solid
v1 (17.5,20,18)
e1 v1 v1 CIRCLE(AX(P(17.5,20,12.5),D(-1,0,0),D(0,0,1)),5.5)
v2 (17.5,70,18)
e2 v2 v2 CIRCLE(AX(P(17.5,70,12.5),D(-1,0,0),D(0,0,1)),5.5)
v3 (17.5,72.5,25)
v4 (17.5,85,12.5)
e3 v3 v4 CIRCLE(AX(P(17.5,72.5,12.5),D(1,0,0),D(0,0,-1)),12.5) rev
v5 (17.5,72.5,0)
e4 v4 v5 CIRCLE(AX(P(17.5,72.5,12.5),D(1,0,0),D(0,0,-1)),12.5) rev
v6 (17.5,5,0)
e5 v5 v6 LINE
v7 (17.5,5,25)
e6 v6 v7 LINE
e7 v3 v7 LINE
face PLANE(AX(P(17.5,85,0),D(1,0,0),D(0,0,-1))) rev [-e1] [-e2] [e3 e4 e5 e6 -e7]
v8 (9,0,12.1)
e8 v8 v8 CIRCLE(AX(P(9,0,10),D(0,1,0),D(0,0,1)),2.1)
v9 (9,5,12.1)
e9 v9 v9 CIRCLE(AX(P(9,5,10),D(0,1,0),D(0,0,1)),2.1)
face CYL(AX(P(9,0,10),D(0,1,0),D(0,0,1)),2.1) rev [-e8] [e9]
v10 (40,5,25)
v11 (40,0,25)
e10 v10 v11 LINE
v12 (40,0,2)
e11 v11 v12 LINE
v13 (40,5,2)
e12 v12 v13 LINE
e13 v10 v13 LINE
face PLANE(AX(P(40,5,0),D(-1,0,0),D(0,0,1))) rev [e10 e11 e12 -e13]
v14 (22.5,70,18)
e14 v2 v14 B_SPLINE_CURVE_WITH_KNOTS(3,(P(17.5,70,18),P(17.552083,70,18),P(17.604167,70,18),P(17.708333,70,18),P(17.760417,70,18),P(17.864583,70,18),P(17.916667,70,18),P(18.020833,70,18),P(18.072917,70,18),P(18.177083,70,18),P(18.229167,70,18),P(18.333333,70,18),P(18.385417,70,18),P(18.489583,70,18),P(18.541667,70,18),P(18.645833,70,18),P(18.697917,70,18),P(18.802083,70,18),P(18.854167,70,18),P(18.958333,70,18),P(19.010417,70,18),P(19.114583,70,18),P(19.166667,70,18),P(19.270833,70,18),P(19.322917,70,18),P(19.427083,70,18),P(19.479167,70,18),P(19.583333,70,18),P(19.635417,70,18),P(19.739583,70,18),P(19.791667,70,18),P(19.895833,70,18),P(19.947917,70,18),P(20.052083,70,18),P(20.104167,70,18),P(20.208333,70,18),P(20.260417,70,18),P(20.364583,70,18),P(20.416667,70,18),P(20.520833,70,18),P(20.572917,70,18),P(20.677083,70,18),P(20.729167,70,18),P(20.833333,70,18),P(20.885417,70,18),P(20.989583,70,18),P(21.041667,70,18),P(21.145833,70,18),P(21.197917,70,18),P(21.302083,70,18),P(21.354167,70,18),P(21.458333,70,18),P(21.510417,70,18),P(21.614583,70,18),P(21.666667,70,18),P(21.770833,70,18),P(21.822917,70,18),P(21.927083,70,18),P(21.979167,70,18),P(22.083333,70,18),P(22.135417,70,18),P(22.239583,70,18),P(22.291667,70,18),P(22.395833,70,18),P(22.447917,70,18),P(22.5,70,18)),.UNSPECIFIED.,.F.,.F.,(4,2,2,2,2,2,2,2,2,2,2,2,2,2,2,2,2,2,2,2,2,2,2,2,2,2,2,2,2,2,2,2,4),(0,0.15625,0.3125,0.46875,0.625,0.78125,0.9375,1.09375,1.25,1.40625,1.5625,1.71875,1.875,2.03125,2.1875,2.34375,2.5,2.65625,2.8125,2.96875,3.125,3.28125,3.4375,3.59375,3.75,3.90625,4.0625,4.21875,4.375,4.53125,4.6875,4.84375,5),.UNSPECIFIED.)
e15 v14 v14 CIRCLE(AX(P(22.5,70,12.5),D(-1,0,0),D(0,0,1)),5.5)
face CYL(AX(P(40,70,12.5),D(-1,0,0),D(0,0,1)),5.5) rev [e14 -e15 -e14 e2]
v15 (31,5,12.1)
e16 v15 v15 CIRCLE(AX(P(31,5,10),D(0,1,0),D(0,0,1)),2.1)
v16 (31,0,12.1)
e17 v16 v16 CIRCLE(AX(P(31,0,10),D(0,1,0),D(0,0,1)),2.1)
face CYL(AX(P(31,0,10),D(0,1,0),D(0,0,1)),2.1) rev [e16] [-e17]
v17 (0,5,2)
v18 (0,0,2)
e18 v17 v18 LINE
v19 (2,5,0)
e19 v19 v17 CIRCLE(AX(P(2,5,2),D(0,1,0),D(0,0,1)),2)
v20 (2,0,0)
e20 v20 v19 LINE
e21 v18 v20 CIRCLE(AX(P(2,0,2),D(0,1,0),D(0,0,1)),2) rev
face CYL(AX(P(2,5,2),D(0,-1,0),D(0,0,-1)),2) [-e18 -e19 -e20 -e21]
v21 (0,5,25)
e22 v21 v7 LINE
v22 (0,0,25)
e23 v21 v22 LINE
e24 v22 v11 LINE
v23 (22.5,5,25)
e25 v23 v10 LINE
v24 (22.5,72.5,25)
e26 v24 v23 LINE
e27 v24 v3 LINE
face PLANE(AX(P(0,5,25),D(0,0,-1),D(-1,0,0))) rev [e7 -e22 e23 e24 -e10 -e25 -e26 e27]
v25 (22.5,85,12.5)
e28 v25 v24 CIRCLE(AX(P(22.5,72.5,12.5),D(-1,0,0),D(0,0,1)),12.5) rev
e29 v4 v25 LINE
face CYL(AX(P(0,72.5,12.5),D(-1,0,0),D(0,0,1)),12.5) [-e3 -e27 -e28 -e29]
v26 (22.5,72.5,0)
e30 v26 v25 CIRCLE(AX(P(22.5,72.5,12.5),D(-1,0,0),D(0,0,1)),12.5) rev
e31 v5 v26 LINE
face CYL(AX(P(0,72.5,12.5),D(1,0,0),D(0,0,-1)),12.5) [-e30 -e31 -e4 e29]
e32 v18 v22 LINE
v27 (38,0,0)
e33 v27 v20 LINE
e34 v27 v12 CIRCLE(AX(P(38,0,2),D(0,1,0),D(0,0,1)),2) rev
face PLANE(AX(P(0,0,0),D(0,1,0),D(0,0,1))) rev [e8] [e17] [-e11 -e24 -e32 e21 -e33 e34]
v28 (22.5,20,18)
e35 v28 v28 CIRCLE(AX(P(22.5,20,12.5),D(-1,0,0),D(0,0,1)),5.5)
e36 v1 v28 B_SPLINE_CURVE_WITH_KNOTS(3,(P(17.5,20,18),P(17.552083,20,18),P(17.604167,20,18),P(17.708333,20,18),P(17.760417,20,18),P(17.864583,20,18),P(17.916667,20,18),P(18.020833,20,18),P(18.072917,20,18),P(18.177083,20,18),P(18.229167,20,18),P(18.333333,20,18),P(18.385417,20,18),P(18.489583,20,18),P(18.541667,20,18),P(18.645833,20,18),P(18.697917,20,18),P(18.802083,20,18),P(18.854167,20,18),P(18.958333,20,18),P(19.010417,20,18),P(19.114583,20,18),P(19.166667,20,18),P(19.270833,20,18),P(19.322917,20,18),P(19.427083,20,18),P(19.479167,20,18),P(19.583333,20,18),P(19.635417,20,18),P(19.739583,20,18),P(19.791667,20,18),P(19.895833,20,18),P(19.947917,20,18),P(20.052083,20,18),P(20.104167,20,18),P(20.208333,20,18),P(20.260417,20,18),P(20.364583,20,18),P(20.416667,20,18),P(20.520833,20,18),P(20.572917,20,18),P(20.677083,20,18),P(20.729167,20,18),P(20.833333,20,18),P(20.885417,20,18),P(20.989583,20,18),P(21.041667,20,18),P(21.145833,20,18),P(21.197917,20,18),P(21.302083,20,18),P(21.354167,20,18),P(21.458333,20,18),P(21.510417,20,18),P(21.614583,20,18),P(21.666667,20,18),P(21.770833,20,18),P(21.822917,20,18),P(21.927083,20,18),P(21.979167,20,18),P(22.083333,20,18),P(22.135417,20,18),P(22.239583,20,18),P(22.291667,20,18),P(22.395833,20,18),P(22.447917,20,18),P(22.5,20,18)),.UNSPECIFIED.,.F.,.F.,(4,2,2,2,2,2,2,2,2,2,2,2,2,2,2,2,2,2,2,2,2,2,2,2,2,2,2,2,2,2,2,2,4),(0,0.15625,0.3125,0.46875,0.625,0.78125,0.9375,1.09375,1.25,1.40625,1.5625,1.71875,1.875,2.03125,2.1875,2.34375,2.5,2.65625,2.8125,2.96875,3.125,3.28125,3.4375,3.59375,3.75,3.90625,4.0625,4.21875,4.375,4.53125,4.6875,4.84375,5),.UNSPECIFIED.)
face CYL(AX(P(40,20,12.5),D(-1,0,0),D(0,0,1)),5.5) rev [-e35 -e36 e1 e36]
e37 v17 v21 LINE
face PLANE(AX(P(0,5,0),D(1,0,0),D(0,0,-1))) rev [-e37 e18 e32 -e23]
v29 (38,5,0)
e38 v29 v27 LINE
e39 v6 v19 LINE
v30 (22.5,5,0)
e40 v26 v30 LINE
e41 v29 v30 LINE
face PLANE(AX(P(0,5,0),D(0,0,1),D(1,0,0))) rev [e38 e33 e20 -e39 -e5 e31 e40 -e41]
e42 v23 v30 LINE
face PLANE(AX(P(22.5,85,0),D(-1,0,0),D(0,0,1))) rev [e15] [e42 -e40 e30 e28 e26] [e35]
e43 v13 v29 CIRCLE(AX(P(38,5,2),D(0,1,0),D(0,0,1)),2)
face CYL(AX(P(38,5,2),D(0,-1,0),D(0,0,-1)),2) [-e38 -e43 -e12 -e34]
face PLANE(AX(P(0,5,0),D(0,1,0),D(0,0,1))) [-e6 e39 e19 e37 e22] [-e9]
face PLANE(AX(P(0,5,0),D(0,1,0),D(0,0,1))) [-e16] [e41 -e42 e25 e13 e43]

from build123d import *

# Parameters (mm, degrees)
SKETCH1_W           = 40
SKETCH1_H           = 25
BOSS_EXTRUDE1_DEPTH = 5
SKETCH3_W           = 5
SKETCH3_H           = 25
BOSS_EXTRUDE2_DEPTH = 80
SKETCH4_R           = 5.5
CUT_EXTRUDE1_DEPTH  = 92.412526494
SKETCH7_R           = 2.1
CUT_EXTRUDE2_DEPTH  = 93.870878105
FILLET1_R           = 12.5
FILLET2_R           = 2


with BuildPart() as part:
    # Sketch1 → Boss-Extrude1 (new body)
    with BuildSketch(Plane(origin=(0, 0, 0), x_dir=(1, 0, 0), z_dir=(0, 1, 0))):
        with Locations((20, -12.5)):
            Rectangle(SKETCH1_W, SKETCH1_H)
    extrude(amount=BOSS_EXTRUDE1_DEPTH)

    # Sketch3 → Boss-Extrude2 (add)
    with BuildSketch(Plane(origin=(0, 5, 0), x_dir=(1, 0, 0), z_dir=(0, 1, 0))):
        with Locations((20, -12.5)):
            Rectangle(SKETCH3_W, SKETCH3_H)
    extrude(amount=BOSS_EXTRUDE2_DEPTH)

    # Sketch4 → Cut-Extrude1 (cut, through all)
    with BuildSketch(Plane.ZY.offset(-17.5)):
        with Locations((12.5, 70)):
            Circle(SKETCH4_R)
        with Locations((12.5, 20)):
            Circle(SKETCH4_R)
    extrude(amount=-CUT_EXTRUDE1_DEPTH, mode=Mode.SUBTRACT)

    # Sketch7 → Cut-Extrude2 (cut, through all)
    with BuildSketch(Plane(origin=(0, 5, 0), x_dir=(1, 0, 0), z_dir=(0, 1, 0))):
        with Locations(Location((9, -10, 0), (0, 0, 270))):
            Circle(SKETCH7_R)
        with Locations(Location((31, -10, 0), (0, 0, 270))):
            Circle(SKETCH7_R)
    extrude(amount=-CUT_EXTRUDE2_DEPTH, mode=Mode.SUBTRACT)

    # Fillet1
    fillet1_edges = [part.edges().sort_by_distance(p)[0] for p in [
        (20, 85, 0),
        (20, 85, 25),
    ]]
    fillet(fillet1_edges, radius=FILLET1_R - 0.0001)  # a hair under: the kernel refuses the full size

    # Fillet2
    fillet2_edges = [part.edges().sort_by_distance(p)[0] for p in [
        (0, 2.5, 0),
        (40, 2.5, 0),
    ]]
    fillet(fillet2_edges, radius=FILLET2_R)


solid = part.part
